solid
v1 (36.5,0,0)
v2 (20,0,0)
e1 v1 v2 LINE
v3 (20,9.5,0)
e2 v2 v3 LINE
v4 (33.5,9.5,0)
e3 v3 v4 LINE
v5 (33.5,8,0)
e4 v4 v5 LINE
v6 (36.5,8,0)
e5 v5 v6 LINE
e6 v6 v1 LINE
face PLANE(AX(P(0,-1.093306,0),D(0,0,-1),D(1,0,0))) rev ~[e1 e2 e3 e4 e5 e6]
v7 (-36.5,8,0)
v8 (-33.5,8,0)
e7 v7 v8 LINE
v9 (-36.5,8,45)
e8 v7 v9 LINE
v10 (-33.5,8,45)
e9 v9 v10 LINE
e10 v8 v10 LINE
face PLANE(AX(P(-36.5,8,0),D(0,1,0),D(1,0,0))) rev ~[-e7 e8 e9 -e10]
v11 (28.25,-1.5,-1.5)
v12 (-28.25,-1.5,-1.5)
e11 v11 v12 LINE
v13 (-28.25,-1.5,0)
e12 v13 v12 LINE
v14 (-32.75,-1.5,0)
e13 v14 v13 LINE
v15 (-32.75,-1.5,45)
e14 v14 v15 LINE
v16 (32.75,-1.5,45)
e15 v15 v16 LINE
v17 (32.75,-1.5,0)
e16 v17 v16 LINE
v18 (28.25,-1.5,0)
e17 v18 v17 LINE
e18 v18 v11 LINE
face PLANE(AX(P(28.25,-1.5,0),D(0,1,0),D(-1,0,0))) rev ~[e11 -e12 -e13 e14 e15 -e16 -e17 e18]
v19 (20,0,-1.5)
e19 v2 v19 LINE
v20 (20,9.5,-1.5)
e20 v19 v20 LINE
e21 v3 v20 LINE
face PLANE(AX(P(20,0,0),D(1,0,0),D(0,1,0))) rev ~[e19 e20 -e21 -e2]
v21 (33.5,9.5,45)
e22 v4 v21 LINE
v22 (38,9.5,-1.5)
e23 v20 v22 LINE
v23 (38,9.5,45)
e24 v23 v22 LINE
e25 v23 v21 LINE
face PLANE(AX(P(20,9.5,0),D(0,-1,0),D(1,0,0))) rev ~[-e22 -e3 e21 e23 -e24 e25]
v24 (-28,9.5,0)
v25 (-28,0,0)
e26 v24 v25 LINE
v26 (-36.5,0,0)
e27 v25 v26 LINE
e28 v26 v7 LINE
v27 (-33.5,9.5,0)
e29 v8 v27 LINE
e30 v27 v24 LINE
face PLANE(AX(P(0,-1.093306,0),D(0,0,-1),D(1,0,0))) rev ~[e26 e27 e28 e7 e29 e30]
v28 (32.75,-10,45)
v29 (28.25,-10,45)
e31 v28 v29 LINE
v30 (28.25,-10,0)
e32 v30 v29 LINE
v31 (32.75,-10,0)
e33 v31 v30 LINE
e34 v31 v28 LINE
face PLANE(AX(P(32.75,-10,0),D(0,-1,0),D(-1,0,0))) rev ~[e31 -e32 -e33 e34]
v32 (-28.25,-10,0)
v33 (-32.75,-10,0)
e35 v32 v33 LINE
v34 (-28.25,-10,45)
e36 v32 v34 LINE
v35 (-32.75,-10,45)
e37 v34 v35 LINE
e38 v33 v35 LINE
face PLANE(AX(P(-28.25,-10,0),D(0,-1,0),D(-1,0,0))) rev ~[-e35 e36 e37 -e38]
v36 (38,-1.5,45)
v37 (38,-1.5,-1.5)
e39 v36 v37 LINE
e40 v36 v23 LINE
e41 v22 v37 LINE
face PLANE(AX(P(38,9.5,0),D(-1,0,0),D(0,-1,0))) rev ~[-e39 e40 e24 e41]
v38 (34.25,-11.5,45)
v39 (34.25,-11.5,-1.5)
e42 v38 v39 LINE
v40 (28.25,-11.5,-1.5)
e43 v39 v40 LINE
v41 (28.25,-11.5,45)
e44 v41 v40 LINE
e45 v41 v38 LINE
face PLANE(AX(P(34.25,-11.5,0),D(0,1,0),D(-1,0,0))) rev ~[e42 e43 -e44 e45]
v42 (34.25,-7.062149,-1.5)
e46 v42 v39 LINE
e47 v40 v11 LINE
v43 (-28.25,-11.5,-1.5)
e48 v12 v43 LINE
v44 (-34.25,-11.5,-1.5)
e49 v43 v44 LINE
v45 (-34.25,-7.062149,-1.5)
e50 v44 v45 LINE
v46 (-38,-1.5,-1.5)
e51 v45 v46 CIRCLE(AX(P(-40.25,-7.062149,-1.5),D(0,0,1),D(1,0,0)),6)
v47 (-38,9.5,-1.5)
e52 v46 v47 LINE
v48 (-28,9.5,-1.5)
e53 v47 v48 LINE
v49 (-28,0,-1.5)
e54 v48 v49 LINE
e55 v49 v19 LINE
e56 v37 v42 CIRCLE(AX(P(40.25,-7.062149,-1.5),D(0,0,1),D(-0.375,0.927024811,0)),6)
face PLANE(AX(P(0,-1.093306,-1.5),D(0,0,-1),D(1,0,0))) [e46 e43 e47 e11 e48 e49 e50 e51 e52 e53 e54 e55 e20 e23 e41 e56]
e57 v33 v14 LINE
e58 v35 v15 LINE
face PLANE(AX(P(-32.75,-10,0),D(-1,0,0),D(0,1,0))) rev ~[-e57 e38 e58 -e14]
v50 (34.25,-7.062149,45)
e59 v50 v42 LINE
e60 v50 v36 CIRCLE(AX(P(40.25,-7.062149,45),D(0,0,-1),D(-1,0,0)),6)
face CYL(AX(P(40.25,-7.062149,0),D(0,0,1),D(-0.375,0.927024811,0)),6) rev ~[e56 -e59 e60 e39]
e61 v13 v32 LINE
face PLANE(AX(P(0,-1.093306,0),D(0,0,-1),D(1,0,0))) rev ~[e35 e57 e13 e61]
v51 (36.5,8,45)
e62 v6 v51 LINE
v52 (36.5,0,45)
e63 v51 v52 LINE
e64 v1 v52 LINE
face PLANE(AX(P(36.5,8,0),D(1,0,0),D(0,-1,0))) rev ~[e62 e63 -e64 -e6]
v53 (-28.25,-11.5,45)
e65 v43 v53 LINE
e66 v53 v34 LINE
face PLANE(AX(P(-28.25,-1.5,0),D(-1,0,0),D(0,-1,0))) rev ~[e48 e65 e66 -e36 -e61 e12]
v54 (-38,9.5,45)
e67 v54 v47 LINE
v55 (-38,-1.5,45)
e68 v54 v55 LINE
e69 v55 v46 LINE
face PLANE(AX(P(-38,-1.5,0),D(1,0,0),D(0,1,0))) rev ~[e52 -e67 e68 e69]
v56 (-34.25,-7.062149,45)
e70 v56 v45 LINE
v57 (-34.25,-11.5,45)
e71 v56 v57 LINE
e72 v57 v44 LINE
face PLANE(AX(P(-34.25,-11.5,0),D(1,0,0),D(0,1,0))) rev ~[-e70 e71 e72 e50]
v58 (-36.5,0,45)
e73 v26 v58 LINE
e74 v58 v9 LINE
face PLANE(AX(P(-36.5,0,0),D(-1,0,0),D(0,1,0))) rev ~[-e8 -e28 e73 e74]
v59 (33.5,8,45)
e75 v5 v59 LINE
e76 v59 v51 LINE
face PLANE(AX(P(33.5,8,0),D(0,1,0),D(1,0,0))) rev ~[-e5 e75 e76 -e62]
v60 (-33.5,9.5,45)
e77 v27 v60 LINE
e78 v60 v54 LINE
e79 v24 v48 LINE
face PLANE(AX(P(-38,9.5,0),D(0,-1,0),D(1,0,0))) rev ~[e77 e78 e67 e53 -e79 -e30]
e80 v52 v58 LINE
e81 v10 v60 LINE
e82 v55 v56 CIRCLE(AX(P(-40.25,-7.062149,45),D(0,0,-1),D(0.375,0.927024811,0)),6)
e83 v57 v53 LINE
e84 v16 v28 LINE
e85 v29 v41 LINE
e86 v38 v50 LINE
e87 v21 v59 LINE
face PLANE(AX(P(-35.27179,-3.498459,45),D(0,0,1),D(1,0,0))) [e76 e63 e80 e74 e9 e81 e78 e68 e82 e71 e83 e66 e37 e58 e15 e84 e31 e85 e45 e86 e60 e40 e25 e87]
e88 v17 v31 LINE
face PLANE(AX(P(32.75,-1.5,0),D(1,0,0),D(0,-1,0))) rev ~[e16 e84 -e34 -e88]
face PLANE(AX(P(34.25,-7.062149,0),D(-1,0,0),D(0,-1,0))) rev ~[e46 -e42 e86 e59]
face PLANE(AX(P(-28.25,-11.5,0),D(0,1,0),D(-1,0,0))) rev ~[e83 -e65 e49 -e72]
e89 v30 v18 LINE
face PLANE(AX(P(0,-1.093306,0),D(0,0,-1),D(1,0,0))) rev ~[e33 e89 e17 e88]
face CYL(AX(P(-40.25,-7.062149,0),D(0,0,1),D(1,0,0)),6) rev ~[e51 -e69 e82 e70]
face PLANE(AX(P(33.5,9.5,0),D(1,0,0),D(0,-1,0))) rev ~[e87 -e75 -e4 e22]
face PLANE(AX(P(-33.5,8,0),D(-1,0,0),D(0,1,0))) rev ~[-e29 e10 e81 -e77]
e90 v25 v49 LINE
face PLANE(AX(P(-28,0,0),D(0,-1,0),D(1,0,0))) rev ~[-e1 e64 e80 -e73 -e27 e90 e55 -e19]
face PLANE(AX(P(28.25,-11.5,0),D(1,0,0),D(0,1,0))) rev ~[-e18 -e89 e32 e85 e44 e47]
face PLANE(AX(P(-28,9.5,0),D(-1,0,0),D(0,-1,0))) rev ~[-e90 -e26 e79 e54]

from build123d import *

# Parameters (mm, degrees)
F1_DEPTH    = 45
F2_T1_DEPTH = 45
F3_W        = 4.5
F3_H        = 8.5
F4_DEPTH    = 1.5


# Not quite as in the source:
# - a fillet or chamfer that OpenCascade refuses, or shapes differently, is made with other operations: its cross-section is extruded or revolved along the edge and cut away or added


with BuildPart() as f1:
    # F0 (on Top) → F1 (new body)
    with BuildSketch(Plane.XY):
        Polygon((36.5, 0), (0, 0), (-36.5, 0), (-36.5, 8), (-33.5, 8), (-33.5, 9.5), (-38, 9.5), (-38, -1.5), (-34.25, -1.5), (-32.75, -1.5), (0, -1.5), (32.75, -1.5), (34.25, -1.5), (38, -1.5), (38, 9.5), (33.5, 9.5), (33.5, 8), (36.5, 8), align=None)
        Polygon((-32.75, -1.5), (-34.25, -1.5), (-34.25, -11.5), (-28.25, -11.5), (-28.25, -10), (-32.75, -10), align=None)
        Polygon((34.25, -11.5), (34.25, -1.5), (32.75, -1.5), (32.75, -10), (28.25, -10), (28.25, -11.5), align=None)
    extrude(amount=F1_DEPTH)

    # F2: fillet of radius 6 on 2 edges, made by hand

    # F2_s2 → F2_t1 (join)
    with BuildSketch(Plane.XY):
        with BuildLine():
            ThreePointArc((-38, -1.5), (-35.2750628145, -3.7080468991), (-34.25, -7.0621488653))
            Line((-34.25, -7.0621488653), (-34.25, -1.5))
            Line((-34.25, -1.5), (-38, -1.5))
        make_face()
        with BuildLine():
            ThreePointArc((34.25, -7.0621488653), (35.2750628145, -3.7080468991), (38, -1.5))
            Line((38, -1.5), (34.25, -1.5))
            Line((34.25, -1.5), (34.25, -7.0621488653))
        make_face()
    extrude(amount=F2_T1_DEPTH)

    # F3 (on face) → F4 (join)
    with BuildSketch(Plane(origin=(0, 0, 0), x_dir=(1, 0, 0), z_dir=(0, 0, -1))):
        with BuildLine():
            Line((-32.75, 10), (-28.25, 10))
            Line((-28.25, 10), (-28.25, 11.5))
            Line((-28.25, 11.5), (-34.25, 11.5))
            Line((-34.25, 11.5), (-34.25, 7.0621488653))
            ThreePointArc((-34.25, 7.0621488653), (-35.2750628145, 3.7080468991), (-38, 1.5))
            Line((-38, 1.5), (-38, -9.5))
            Line((-38, -9.5), (-33.5, -9.5))
            Line((-33.5, -9.5), (-33.5, -8))
            Line((-33.5, -8), (-36.5, -8))
            Line((-36.5, -8), (-36.5, 0))
            Line((-36.5, 0), (-28, 0))
            Line((-28, 0), (20, 0))
            Line((20, 0), (36.5, 0))
            Line((36.5, 0), (36.5, -8))
            Line((36.5, -8), (33.5, -8))
            Line((33.5, -8), (33.5, -9.5))
            Line((33.5, -9.5), (38, -9.5))
            Line((38, -9.5), (38, 1.5))
            ThreePointArc((38, 1.5), (35.2750628145, 3.7080468991), (34.25, 7.0621488653))
            Line((34.25, 7.0621488653), (34.25, 11.5))
            Line((34.25, 11.5), (28.25, 11.5))
            Line((28.25, 11.5), (28.25, 10))
            Line((28.25, 10), (32.75, 10))
            Line((32.75, 10), (32.75, 1.5))
            Line((32.75, 1.5), (28.25, 1.5))
            Line((28.25, 1.5), (-28.25, 1.5))
            Line((-28.25, 1.5), (-32.75, 1.5))
            Line((-32.75, 1.5), (-32.75, 10))
        make_face()
        with Locations((-30.5, 5.75)):
            Rectangle(F3_W, F3_H)
        Polygon((-33.5, -8), (-33.5, -9.5), (-28, -9.5), (-28, 0), (-36.5, 0), (-36.5, -8), align=None)
        with Locations((30.5, 5.75)):
            Rectangle(F3_W, F3_H)
        Polygon((20, -9.5), (33.5, -9.5), (33.5, -8), (36.5, -8), (36.5, 0), (20, 0), align=None)
    extrude(amount=F4_DEPTH)


solid = f1.part
